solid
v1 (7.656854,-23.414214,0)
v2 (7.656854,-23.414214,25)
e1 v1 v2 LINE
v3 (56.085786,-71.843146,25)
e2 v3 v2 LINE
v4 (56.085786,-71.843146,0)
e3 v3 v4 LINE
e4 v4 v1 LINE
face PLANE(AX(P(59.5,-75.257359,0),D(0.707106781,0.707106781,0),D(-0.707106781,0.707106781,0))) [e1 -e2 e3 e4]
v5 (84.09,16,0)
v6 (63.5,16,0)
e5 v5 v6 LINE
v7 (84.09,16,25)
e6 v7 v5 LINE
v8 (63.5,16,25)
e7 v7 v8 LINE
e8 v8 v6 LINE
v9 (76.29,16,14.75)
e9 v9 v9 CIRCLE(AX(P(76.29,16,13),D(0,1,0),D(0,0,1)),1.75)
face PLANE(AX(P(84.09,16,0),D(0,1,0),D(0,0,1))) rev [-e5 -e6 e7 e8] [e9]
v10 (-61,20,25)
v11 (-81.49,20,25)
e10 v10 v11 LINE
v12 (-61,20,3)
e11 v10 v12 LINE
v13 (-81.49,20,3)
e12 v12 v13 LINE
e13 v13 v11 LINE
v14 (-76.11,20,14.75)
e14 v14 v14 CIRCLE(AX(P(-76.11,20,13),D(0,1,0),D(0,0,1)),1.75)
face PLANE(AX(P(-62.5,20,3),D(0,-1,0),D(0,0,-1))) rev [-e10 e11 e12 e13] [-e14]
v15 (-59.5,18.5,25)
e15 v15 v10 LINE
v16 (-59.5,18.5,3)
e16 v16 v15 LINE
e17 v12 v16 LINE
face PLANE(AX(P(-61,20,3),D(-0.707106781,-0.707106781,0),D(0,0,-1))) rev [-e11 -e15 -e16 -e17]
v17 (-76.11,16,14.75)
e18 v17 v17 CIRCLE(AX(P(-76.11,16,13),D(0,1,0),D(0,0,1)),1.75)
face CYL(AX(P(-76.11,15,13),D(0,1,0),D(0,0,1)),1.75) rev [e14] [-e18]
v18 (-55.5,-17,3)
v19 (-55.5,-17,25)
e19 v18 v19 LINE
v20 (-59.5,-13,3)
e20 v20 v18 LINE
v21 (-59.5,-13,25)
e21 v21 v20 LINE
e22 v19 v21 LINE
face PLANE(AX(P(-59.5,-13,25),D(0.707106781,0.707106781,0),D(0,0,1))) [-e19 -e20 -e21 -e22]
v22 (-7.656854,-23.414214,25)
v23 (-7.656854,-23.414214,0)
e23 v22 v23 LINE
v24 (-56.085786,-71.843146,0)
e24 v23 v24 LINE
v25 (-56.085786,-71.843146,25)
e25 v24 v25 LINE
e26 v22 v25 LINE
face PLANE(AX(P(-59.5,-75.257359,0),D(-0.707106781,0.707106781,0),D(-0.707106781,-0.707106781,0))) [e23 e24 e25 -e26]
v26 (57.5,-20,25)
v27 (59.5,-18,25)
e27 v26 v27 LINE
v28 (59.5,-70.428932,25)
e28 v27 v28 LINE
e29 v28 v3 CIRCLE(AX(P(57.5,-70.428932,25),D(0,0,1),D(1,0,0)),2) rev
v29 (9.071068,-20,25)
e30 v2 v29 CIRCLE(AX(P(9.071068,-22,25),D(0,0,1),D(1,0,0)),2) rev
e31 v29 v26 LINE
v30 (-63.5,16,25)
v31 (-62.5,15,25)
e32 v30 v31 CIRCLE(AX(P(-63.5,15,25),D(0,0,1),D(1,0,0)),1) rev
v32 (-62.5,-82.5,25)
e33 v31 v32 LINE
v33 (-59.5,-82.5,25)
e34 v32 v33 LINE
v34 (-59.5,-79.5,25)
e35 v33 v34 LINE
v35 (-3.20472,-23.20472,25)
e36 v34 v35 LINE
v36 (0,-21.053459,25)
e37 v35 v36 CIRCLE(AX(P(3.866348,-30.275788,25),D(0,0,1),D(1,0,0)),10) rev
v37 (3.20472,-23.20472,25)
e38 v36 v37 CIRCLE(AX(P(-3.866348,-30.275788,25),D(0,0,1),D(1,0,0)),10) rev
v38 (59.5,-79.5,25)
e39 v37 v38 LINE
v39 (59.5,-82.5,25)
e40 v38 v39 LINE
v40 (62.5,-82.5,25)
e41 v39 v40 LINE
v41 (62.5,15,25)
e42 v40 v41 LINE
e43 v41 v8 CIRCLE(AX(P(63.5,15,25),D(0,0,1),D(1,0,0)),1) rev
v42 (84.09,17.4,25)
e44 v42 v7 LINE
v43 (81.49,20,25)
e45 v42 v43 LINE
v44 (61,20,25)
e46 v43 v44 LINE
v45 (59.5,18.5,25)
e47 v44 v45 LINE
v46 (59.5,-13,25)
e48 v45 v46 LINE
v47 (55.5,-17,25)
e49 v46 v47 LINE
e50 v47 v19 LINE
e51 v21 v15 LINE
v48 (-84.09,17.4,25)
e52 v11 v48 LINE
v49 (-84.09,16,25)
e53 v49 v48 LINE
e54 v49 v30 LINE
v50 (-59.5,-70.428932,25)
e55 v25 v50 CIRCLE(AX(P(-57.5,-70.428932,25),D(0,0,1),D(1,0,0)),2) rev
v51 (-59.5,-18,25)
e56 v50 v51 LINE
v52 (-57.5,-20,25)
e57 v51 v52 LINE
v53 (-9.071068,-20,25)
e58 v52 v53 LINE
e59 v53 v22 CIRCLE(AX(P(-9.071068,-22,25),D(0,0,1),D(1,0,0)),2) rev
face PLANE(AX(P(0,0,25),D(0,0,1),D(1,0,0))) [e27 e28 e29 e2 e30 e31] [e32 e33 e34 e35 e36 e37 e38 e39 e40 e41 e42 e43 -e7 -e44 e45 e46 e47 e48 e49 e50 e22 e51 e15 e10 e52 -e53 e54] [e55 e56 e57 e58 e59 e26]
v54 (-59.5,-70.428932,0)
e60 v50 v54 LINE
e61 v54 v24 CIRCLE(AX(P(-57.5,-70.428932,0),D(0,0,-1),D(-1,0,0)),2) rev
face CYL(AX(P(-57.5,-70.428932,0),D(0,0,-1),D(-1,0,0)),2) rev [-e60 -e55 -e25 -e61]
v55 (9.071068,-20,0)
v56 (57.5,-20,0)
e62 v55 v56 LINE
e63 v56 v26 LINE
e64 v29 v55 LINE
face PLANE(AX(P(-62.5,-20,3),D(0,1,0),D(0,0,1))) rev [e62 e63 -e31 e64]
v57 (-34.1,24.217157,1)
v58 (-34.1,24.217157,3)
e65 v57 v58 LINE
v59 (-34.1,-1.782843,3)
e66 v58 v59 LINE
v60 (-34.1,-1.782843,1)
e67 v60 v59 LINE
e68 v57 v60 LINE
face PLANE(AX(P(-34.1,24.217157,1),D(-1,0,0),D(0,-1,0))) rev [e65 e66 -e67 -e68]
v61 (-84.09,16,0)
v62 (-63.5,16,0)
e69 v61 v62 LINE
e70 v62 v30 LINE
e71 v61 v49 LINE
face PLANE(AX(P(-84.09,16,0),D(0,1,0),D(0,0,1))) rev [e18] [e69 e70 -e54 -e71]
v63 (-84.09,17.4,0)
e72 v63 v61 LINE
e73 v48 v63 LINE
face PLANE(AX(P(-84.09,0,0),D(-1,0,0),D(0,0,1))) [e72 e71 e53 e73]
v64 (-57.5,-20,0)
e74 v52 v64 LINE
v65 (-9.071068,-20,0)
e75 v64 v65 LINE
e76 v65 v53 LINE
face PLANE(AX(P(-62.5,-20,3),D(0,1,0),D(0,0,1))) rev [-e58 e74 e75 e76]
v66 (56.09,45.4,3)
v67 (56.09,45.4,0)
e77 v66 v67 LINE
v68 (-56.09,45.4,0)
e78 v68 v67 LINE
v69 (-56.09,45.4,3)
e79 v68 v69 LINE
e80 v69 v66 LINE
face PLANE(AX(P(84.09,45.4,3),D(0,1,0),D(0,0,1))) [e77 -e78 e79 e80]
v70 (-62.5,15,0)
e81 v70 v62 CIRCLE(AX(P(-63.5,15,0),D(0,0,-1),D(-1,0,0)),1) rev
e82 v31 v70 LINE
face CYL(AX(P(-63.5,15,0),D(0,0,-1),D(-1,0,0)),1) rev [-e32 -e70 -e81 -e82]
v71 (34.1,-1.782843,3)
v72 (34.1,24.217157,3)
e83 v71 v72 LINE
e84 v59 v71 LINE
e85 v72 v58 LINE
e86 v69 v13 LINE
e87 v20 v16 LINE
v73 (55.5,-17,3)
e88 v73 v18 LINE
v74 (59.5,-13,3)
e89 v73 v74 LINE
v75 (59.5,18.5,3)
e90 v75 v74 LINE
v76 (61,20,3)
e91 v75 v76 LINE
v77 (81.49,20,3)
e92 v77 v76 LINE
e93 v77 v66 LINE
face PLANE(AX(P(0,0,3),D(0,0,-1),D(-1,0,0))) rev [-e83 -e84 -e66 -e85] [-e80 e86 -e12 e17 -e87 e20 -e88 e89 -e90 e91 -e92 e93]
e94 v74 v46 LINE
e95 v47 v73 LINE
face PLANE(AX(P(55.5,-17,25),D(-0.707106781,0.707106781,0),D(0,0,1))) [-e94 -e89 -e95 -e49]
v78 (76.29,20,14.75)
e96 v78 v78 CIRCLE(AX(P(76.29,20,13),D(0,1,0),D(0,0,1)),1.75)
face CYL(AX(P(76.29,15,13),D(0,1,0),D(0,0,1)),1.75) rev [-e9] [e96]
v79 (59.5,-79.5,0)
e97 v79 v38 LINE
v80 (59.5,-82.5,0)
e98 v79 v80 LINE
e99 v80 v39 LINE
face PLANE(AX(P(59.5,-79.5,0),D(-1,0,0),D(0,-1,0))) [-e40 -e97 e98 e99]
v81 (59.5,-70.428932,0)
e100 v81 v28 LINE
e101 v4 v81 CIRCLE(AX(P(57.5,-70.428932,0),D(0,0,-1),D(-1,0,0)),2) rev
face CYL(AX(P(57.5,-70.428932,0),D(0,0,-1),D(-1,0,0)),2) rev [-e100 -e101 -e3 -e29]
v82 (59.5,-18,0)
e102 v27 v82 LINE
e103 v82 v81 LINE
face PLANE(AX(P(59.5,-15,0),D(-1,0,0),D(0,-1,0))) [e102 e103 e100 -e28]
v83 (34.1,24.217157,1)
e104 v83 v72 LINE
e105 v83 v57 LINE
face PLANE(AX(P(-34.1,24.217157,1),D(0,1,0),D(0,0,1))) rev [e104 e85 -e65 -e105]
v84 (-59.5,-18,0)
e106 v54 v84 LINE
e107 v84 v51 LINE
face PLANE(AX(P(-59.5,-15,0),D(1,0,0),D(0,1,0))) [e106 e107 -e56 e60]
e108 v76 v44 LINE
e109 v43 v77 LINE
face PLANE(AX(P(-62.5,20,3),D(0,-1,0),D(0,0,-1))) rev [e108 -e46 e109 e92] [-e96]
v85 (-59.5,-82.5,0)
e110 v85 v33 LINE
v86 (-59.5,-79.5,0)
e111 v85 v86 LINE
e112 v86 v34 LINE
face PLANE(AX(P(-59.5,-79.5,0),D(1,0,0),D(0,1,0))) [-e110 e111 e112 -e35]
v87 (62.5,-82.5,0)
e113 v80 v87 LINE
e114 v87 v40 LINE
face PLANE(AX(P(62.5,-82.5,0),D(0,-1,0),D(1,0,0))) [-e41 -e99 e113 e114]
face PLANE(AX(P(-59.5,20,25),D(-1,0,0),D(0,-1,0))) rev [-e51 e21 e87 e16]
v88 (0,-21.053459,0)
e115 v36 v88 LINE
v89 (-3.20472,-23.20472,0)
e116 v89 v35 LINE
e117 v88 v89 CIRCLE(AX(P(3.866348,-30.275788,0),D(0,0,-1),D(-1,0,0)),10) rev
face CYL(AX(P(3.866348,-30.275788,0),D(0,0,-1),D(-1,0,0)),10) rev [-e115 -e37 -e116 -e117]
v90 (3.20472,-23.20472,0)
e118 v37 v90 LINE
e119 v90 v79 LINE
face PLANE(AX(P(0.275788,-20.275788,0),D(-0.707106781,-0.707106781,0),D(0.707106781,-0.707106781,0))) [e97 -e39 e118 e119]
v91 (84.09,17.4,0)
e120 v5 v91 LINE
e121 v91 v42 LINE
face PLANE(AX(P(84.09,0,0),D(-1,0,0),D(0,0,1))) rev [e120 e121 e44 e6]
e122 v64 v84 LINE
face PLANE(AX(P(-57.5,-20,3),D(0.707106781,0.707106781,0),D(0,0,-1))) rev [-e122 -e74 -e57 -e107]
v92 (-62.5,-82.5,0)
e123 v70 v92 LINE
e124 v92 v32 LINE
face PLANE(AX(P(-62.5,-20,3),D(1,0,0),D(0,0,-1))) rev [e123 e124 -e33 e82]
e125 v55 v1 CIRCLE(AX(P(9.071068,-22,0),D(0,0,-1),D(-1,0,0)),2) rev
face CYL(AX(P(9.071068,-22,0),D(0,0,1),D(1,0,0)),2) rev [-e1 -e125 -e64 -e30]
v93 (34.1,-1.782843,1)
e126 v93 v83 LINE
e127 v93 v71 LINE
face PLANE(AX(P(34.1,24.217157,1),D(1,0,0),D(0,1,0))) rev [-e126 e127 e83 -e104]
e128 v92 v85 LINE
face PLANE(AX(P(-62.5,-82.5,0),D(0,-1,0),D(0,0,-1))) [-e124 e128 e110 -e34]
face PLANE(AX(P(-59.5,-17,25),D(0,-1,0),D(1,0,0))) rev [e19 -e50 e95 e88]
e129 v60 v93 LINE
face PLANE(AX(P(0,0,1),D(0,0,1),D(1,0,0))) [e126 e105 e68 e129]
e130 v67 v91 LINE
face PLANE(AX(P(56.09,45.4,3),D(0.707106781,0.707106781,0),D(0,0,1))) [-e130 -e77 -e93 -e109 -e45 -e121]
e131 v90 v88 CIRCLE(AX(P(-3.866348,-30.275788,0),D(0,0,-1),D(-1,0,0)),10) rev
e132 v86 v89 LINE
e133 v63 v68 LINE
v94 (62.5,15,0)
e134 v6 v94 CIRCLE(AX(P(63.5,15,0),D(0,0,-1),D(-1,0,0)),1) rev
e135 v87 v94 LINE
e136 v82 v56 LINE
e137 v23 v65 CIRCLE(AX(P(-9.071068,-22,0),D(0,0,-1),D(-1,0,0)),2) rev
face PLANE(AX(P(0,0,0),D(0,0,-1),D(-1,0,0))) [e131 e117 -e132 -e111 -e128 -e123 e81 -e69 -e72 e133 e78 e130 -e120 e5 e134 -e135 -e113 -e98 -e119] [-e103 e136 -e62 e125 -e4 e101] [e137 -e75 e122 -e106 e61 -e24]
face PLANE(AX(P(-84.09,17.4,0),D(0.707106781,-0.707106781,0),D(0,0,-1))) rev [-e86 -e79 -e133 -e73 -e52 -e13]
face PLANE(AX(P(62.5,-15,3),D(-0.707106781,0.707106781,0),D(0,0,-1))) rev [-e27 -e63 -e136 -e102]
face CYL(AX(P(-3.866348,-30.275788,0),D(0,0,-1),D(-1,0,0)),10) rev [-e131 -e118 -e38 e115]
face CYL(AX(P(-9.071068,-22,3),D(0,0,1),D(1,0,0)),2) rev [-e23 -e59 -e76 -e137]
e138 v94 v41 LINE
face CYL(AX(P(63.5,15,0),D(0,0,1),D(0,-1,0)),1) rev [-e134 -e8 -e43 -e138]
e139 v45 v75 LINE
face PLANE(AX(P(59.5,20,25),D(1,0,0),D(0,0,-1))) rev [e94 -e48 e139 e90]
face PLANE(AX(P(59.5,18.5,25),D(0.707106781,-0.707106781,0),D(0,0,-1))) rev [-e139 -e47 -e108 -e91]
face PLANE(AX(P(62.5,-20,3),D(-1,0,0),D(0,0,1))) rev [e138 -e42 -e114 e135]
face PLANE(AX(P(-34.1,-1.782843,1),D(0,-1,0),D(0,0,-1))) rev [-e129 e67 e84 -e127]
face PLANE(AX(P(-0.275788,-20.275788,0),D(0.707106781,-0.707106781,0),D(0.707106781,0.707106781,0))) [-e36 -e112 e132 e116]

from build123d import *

# Parameters (mm, degrees)
SKETCH1_W            = 125
SKETCH1_H            = 40
BOSS_EXTRUDE1_DEPTH  = 3
SKETCH2_W            = 3
SKETCH2_H            = 40
BOSS_EXTRUDE2_DEPTH  = 22
SKETCH4_W            = 25
SKETCH4_H            = 4
BOSS_EXTRUDE4_DEPTH  = 21.59
SKETCH5_W            = 25
SKETCH5_H            = 4
BOSS_EXTRUDE5_DEPTH  = 21.59
SKETCH6_W            = 168.18
SKETCH6_H            = 25.4
BOSS_EXTRUDE6_DEPTH  = 3
CHAMFER1_SIZE        = 28
SKETCH7_W            = 68.2
SKETCH7_H            = 26
CUT_EXTRUDE1_DEPTH   = 2
SKETCH9_W            = 119
SKETCH9_H            = 3
BOSS_EXTRUDE7_DEPTH  = 22
CHAMFER2_SIZE        = 4
CHAMFER3_SIZE        = 5
SKETCH11_R           = 1.75
CUT_EXTRUDE3_DEPTH   = 5
FILLET1_R            = 1
CHAMFER4_SIZE        = 1.5
BOSS_EXTRUDE10_DEPTH = 25
FILLET2_R            = 10
FILLET3_R            = 2
FILLET4_R            = 2


with BuildPart() as part:
    # Sketch1 → Boss-Extrude1 (new body)
    with BuildSketch(Plane.XY):
        Rectangle(SKETCH1_W, SKETCH1_H)
    extrude(amount=BOSS_EXTRUDE1_DEPTH)

    # Sketch2 → Boss-Extrude2 (add)
    with BuildSketch(Plane.XY.offset(3)):
        with Locations((-61, 0)):
            Rectangle(SKETCH2_W, SKETCH2_H)
        with Locations((61, 0)):
            Rectangle(SKETCH2_W, SKETCH2_H)
    extrude(amount=BOSS_EXTRUDE2_DEPTH)

    # Sketch4 → Boss-Extrude4 (add)
    with BuildSketch(Plane.ZY.offset(62.5)):
        with Locations((12.5, 18)):
            Rectangle(SKETCH4_W, SKETCH4_H)
    extrude(amount=BOSS_EXTRUDE4_DEPTH)

    # Sketch5 → Boss-Extrude5 (add)
    with BuildSketch(Plane(origin=(62.5, 0, 0), x_dir=(0, 0, -1), z_dir=(1, 0, 0))):
        with Locations((-12.5, 18)):
            Rectangle(SKETCH5_W, SKETCH5_H)
    extrude(amount=BOSS_EXTRUDE5_DEPTH)

    # Sketch6 → Boss-Extrude6 (add)
    with BuildSketch(Plane(origin=(0, 0, 0), x_dir=(-1, 0, 0), z_dir=(0, 0, -1))):
        with Locations((0, 32.7)):
            Rectangle(SKETCH6_W, SKETCH6_H)
    extrude(amount=-BOSS_EXTRUDE6_DEPTH)

    # Chamfer1
    chamfer1_edges = [part.edges().sort_by_distance(p)[0] for p in [
        (-84.09, 45.4, 1.5),
        (84.09, 45.4, 1.5),
    ]]
    chamfer(chamfer1_edges, length=CHAMFER1_SIZE)

    # Sketch7 → Cut-Extrude1 (cut)
    with BuildSketch(Plane.XY.offset(3)):
        with Locations((0, 11.217156681)):
            Rectangle(SKETCH7_W, SKETCH7_H)
    extrude(amount=-CUT_EXTRUDE1_DEPTH, mode=Mode.SUBTRACT)

    # Sketch9 → Boss-Extrude7 (add)
    with BuildSketch(Plane.XY.offset(3)):
        with Locations((0, -18.5)):
            Rectangle(SKETCH9_W, SKETCH9_H)
    extrude(amount=BOSS_EXTRUDE7_DEPTH)

    # Chamfer2
    chamfer2_edges = [part.edges().sort_by_distance(p)[0] for p in [
        (-59.5, -17, 14),
        (59.5, -17, 14),
    ]]
    chamfer(chamfer2_edges, length=CHAMFER2_SIZE)

    # Chamfer3
    chamfer3_edges = [part.edges().sort_by_distance(p)[0] for p in [
        (62.5, -20, 12.5),
        (-62.5, -20, 12.5),
    ]]
    chamfer(chamfer3_edges, length=CHAMFER3_SIZE)

    # Sketch11 → Cut-Extrude3 (cut)
    with BuildSketch(Plane(origin=(0, 20, 0), x_dir=(1, 0, 0), z_dir=(0, 1, 0))):
        with Locations(Location((-76.11, -13, 0), (0, 0, 270))):
            Circle(SKETCH11_R)
        with Locations(Location((76.29, -13, 0), (0, 0, 270))):
            Circle(SKETCH11_R)
    extrude(amount=-CUT_EXTRUDE3_DEPTH, mode=Mode.SUBTRACT)

    # Fillet1
    fillet1_edges = [part.edges().sort_by_distance(p)[0] for p in [
        (-62.5, 16, 12.5),
        (62.5, 16, 12.5),
    ]]
    fillet(fillet1_edges, radius=FILLET1_R)

    # Chamfer4
    chamfer4_edges = [part.edges().sort_by_distance(p)[0] for p in [
        (-59.5, 20, 14),
        (59.5, 20, 14),
    ]]
    chamfer(chamfer4_edges, length=CHAMFER4_SIZE)

    # Sketch12 → Boss-Extrude10 (add)
    with BuildSketch(Plane.XY.offset(25)):
        Polygon((-0.275787659, -20.275787659), (-59.5, -79.5), (-59.5, -82.5), (-62.5, -82.5), (-62.5, -15), (-59.5, -15), (-59.5, -75.257359313), (-4.242640687, -20), (0, -20), (4.242640687, -20), (59.5, -75.257359313), (59.5, -15), (62.5, -15), (62.5, -82.5), (59.5, -82.5), (59.5, -79.5), (0.275787659, -20.275787659), align=None)
    extrude(amount=-BOSS_EXTRUDE10_DEPTH)

    # Fillet2
    # the kernel refuses this fillet: 10 mm, written as the material it adds along each edge
    with BuildSketch(Plane(origin=(0.275787659, -20.275787659, 25), x_dir=(0.7071067811865169, -0.7071067811865782, 0), z_dir=(0, 0, -1)), Plane(origin=(-0.275787659, -20.275787659, 25), x_dir=(1, 0, 0), z_dir=(0, 0, -1))) as fillet2_piece_1:
        with BuildLine():
            CenterArc((FILLET2_R * 0.414213562373, FILLET2_R), FILLET2_R, 225, 45)
            Line((-FILLET2_R * 0.292893218813, FILLET2_R * 0.292893218813), (0, 0))
            Line((0, 0), (FILLET2_R * 0.414213562373, 0))
        make_face()
    extrude(amount=25)

    # Fillet3
    fillet3_edges = [part.edges().sort_by_distance(p)[0] for p in [
        (59.5, -75.257359313, 12.5),
        (-59.5, -75.257359313, 12.5),
    ]]
    fillet(fillet3_edges, radius=FILLET3_R)

    # Fillet4
    fillet4_edges = [part.edges().sort_by_distance(p)[0] for p in [
        (-4.242640687, -20, 12.5),
        (4.242640687, -20, 12.5),
    ]]
    fillet(fillet4_edges, radius=FILLET4_R)


solid = part.part
